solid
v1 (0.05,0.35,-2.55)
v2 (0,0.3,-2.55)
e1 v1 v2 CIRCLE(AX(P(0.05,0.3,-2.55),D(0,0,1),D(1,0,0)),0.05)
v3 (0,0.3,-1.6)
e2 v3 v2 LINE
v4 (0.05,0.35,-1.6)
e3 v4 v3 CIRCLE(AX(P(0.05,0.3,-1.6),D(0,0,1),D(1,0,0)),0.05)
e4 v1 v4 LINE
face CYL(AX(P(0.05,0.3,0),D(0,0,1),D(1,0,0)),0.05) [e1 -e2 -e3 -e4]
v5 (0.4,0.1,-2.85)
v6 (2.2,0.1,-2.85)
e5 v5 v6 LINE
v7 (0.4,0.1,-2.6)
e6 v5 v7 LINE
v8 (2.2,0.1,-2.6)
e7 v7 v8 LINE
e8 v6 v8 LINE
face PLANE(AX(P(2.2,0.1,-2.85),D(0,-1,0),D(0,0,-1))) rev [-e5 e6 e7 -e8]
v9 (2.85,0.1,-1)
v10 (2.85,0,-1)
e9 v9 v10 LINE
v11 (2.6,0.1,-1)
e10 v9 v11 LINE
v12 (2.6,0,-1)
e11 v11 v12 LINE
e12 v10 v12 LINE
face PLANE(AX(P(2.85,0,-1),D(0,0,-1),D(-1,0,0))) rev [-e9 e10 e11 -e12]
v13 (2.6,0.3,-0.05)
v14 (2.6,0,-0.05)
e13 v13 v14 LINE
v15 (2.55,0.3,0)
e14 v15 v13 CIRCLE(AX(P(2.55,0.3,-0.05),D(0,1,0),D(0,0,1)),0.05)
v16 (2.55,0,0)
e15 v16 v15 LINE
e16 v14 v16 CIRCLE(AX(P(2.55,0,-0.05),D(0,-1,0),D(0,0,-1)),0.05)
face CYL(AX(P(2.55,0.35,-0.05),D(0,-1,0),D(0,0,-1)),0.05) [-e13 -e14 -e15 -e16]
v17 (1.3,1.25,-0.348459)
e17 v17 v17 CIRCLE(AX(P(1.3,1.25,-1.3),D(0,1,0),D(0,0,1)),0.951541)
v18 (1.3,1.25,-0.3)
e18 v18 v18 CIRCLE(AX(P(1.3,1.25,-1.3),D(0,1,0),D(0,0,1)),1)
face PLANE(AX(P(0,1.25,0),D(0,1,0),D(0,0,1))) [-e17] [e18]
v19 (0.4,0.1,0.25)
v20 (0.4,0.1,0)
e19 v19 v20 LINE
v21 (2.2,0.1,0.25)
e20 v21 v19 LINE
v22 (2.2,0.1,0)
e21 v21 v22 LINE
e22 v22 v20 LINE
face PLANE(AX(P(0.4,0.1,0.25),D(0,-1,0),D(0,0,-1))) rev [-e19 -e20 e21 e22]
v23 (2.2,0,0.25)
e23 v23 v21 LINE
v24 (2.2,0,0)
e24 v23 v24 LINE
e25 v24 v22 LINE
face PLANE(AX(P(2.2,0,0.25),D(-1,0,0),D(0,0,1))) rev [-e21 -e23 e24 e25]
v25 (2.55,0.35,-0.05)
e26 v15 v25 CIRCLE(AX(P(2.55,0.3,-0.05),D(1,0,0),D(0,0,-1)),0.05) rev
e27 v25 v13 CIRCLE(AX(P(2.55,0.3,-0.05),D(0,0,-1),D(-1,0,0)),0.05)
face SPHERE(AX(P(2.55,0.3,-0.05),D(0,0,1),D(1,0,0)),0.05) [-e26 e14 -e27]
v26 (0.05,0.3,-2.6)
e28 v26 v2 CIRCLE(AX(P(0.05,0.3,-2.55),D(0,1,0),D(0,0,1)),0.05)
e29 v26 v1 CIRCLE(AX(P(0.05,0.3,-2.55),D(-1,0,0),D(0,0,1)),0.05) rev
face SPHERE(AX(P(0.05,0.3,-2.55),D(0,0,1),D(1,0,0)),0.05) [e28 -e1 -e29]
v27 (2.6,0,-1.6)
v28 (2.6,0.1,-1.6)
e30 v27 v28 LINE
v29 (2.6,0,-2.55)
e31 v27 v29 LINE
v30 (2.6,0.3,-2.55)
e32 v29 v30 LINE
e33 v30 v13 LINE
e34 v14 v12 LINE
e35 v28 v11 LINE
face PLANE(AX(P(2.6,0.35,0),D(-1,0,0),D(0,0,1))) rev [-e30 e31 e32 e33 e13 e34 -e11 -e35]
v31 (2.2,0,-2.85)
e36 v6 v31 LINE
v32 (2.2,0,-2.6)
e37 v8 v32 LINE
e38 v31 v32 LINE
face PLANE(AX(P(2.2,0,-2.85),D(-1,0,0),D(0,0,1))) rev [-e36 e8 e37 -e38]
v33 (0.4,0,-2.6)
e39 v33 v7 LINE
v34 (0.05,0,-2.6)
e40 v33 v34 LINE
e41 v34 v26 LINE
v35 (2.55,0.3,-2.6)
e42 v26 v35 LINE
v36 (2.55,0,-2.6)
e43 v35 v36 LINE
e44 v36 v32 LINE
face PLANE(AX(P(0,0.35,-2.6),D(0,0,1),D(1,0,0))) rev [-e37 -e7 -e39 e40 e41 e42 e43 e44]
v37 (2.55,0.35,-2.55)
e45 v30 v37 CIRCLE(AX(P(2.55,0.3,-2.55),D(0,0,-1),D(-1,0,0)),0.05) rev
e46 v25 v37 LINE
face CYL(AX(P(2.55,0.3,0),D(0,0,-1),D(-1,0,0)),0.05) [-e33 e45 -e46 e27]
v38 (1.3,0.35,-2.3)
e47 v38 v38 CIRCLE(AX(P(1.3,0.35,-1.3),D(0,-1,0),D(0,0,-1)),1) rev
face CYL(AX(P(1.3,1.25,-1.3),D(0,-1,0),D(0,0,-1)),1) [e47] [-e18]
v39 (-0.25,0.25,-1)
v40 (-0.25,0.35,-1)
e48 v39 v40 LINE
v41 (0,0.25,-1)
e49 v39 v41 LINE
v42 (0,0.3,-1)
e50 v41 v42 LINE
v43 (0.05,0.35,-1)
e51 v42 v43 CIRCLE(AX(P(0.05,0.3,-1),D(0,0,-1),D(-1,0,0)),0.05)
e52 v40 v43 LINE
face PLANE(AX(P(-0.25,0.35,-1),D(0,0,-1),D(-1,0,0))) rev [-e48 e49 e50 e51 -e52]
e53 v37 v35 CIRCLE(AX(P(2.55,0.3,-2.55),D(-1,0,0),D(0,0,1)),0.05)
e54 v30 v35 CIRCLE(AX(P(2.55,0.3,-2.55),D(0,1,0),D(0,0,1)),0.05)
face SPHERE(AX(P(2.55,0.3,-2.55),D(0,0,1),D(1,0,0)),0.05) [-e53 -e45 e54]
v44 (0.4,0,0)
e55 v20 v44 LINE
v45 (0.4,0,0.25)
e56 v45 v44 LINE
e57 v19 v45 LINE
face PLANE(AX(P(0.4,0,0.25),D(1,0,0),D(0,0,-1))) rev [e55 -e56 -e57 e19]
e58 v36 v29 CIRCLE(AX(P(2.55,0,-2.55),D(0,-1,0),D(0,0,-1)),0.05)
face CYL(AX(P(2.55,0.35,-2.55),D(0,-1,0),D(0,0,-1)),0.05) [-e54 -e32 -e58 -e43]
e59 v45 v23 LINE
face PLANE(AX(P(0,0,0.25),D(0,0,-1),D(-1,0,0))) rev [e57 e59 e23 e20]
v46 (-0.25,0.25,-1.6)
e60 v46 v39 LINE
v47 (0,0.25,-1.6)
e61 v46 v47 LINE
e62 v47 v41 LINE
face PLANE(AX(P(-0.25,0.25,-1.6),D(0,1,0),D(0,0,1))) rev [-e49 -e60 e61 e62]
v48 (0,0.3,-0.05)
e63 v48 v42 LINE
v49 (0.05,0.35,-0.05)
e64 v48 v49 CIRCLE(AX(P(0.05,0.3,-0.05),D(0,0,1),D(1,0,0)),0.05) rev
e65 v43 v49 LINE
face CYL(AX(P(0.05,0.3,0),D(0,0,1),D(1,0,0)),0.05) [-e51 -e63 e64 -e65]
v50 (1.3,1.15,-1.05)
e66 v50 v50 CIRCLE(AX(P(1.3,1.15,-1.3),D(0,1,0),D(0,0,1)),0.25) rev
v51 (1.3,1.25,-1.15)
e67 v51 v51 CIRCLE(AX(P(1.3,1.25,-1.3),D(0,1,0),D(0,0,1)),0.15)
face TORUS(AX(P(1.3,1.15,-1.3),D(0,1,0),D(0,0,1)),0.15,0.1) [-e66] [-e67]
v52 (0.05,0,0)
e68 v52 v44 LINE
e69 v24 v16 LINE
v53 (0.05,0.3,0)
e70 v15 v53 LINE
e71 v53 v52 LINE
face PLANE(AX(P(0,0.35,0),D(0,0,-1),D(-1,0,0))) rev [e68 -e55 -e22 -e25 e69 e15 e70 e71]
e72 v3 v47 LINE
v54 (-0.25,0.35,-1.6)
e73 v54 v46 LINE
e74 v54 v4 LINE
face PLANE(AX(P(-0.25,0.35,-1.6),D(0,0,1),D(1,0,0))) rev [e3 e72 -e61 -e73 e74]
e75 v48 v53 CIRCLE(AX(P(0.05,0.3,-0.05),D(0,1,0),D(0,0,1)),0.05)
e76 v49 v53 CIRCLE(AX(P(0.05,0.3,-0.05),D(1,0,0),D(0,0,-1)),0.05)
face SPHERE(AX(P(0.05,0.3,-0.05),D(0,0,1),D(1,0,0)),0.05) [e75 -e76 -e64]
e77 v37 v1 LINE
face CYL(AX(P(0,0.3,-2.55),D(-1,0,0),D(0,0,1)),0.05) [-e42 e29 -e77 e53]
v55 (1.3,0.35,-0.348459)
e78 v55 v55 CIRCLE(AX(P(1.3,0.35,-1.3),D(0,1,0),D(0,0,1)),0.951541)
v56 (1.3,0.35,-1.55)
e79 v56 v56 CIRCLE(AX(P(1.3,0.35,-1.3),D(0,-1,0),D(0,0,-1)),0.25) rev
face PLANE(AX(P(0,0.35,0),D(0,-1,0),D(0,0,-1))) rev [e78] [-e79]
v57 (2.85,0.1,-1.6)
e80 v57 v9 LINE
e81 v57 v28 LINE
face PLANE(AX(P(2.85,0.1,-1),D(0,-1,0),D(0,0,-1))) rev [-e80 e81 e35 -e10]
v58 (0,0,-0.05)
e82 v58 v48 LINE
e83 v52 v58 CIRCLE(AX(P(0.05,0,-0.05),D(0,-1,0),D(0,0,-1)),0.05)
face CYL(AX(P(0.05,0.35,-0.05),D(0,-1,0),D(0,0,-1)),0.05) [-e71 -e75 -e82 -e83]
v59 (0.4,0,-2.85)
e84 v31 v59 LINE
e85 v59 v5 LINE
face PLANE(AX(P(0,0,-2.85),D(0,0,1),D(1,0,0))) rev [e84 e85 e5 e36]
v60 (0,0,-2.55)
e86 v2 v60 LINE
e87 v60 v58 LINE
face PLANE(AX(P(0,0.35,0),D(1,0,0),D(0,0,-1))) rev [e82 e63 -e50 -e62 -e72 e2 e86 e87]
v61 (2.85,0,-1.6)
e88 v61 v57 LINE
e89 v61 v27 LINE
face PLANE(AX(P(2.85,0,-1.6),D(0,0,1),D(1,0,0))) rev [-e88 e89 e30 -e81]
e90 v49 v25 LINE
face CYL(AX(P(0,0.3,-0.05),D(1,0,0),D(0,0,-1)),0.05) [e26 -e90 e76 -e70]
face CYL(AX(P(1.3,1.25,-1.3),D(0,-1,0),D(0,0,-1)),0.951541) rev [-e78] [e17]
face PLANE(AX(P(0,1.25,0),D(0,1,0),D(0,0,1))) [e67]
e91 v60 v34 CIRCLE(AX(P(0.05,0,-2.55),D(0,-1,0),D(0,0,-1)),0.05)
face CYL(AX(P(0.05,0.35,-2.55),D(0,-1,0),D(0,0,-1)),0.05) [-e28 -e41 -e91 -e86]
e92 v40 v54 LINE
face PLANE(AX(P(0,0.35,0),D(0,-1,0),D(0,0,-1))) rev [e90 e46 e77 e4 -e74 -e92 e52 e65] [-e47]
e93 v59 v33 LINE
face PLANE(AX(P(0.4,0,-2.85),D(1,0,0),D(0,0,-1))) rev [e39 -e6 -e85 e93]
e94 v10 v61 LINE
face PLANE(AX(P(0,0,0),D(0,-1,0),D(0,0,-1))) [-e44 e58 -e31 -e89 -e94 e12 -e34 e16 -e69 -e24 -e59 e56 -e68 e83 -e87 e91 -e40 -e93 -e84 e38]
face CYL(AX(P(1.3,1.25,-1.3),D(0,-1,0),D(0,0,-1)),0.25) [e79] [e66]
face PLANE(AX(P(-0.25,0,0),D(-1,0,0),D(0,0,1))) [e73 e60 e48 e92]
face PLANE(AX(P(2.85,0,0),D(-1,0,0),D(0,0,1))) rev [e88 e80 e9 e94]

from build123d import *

# Parameters (mm, degrees)
SKETCH_1_W      = 2.6
SKETCH_1_H      = 2.6
EXTRUDE_1_DEPTH = 0.35
SKETCH_2_R      = 1
SKETCH_2_R_2    = 0.951541019
SKETCH_2_R_3    = 0.25
EXTRUDE_2_DEPTH = 0.9
SKETCH_3_W      = 0.6
SKETCH_3_H      = 0.1
EXTRUDE_3_DEPTH = 0.25
SKETCH_4_W      = 1.8
SKETCH_4_H      = 0.1
EXTRUDE_4_DEPTH = 0.25
SKETCH_5_W      = 1.8
SKETCH_5_H      = 0.1
EXTRUDE_5_DEPTH = 0.25
SKETCH_6_W      = 0.6
SKETCH_6_H      = 0.1
EXTRUDE_6_DEPTH = 0.25
FILLET_1_R      = 0.1
FILLET_2_R      = 0.05
FILLET_3_R      = 0.05


with BuildPart() as part:
    # 草图1 → 凸台-拉伸1 (new body)
    with BuildSketch(Plane(origin=(0, 0, 0), x_dir=(1, 0, 0), z_dir=(0, 1, 0))):
        with Locations((1.3, 1.3)):
            Rectangle(SKETCH_1_W, SKETCH_1_H)
    extrude(amount=EXTRUDE_1_DEPTH)

    # 草图2 → 凸台-拉伸2 (add)
    # profile 1 of 2: a face of its own
    with BuildSketch(Plane(origin=(0, 0.35, 0), x_dir=(1, 0, 0), z_dir=(0, 1, 0))):
        with Locations(Location((1.3, 1.3, 0), (0, 0, 90))):
            Circle(SKETCH_2_R)
        with Locations(Location((1.3, 1.3, 0), (0, 0, 270))):
            Circle(SKETCH_2_R_2, mode=Mode.SUBTRACT)
    # profile 2 of 2: a face of its own
    with BuildSketch(Plane(origin=(0, 0.35, 0), x_dir=(1, 0, 0), z_dir=(0, 1, 0))):
        with Locations(Location((1.3, 1.3, 0), (0, 0, 90))):
            Circle(SKETCH_2_R_3)
    extrude(amount=EXTRUDE_2_DEPTH)

    # 草图3 → 凸台-拉伸3 (add)
    with BuildSketch(Plane(origin=(2.6, 0, 0), x_dir=(0, 0, -1), z_dir=(1, 0, 0))):
        with Locations((1.3, 0.05)):
            Rectangle(SKETCH_3_W, SKETCH_3_H)
    extrude(amount=EXTRUDE_3_DEPTH)

    # 草图4 → 凸台-拉伸4 (add)
    with BuildSketch(Plane.XY):
        with Locations((1.3, 0.05)):
            Rectangle(SKETCH_4_W, SKETCH_4_H)
    extrude(amount=EXTRUDE_4_DEPTH)

    # 草图5 → 凸台-拉伸5 (add)
    with BuildSketch(Plane(origin=(0, 0, -2.6), x_dir=(-1, 0, 0), z_dir=(0, 0, -1))):
        with Locations((-1.3, 0.05)):
            Rectangle(SKETCH_5_W, SKETCH_5_H)
    extrude(amount=EXTRUDE_5_DEPTH)

    # 草图6 → 凸台-拉伸6 (add)
    with BuildSketch(Plane.ZY):
        with Locations((-1.3, 0.3)):
            Rectangle(SKETCH_6_W, SKETCH_6_H)
    extrude(amount=EXTRUDE_6_DEPTH)

    # 圆角1
    fillet_1_edges = [part.edges().sort_by_distance(p)[0] for p in [
        (1.3, 1.25, -1.05),
    ]]
    fillet(fillet_1_edges, radius=FILLET_1_R)

    # 圆角2
    fillet_2_edges = [part.edges().sort_by_distance(p)[0] for p in [
        (2.6, 0.35, -1.3),
        (1.3, 0.35, -2.6),
        (0, 0.35, -2.1),
        (0, 0.35, -0.5),
        (1.3, 0.35, 0),
    ]]
    fillet(fillet_2_edges, radius=FILLET_2_R)

    # 圆角3
    # the kernel refuses this fillet: 0.05 mm, written as the material it takes off along each edge
    with BuildSketch(Plane(origin=(0.05, 0.3, -2.55), x_dir=(0, 0, -1), z_dir=(-1, 0, 0))) as fillet_3_piece_1_section:
        Polygon((0, 0), (FILLET_3_R, 0), (FILLET_3_R, -FILLET_3_R), (0, -FILLET_3_R), align=None)
    fillet_3_piece_1 = extrude(amount=FILLET_3_R, mode=Mode.PRIVATE)
    fillet_3_piece_1 = fillet_3_piece_1 - Plane(origin=(0.05, 0.3, -2.55), x_dir=(0, -0.7071067811865475, 0.7071067811865475), z_dir=(-1, 0, 0)) * Sphere(FILLET_3_R, mode=Mode.PRIVATE)
    add(fillet_3_piece_1, mode=Mode.SUBTRACT)
    with BuildSketch(Plane(origin=(0.05, 0.3, -0.05), x_dir=(0, 0, 1), z_dir=(-1, 0, 0))) as fillet_3_piece_2_section:
        Polygon((0, 0), (FILLET_3_R, 0), (FILLET_3_R, FILLET_3_R), (0, FILLET_3_R), align=None)
    fillet_3_piece_2 = extrude(amount=FILLET_3_R, mode=Mode.PRIVATE)
    fillet_3_piece_2 = fillet_3_piece_2 - Plane(origin=(0.05, 0.3, -0.05), x_dir=(0, -0.7071067811865475, -0.7071067811865475), z_dir=(-1, 0, 0)) * Sphere(FILLET_3_R, mode=Mode.PRIVATE)
    add(fillet_3_piece_2, mode=Mode.SUBTRACT)
    with BuildSketch(Plane(origin=(2.55, 0.3, -0.05), x_dir=(0, 0, 1), z_dir=(1, 0, 0))) as fillet_3_piece_3_section:
        Polygon((0, 0), (FILLET_3_R, 0), (FILLET_3_R, -FILLET_3_R), (0, -FILLET_3_R), align=None)
    fillet_3_piece_3 = extrude(amount=FILLET_3_R, mode=Mode.PRIVATE)
    fillet_3_piece_3 = fillet_3_piece_3 - Plane(origin=(2.55, 0.3, -0.05), x_dir=(0, -0.7071067811865475, -0.7071067811865475), z_dir=(1, 0, 0)) * Sphere(FILLET_3_R, mode=Mode.PRIVATE)
    add(fillet_3_piece_3, mode=Mode.SUBTRACT)
    with BuildSketch(Plane(origin=(2.55, 0.3, -2.55), x_dir=(1, 0, 0), z_dir=(0, 0, -1))) as fillet_3_piece_4_section:
        Polygon((0, 0), (FILLET_3_R, 0), (FILLET_3_R, -FILLET_3_R), (0, -FILLET_3_R), align=None)
    fillet_3_piece_4 = extrude(amount=FILLET_3_R, mode=Mode.PRIVATE)
    fillet_3_piece_4 = fillet_3_piece_4 - Plane(origin=(2.55, 0.3, -2.55), x_dir=(-0.7071067811865475, -0.7071067811865475, 0), z_dir=(0, 0, -1)) * Sphere(FILLET_3_R, mode=Mode.PRIVATE)
    add(fillet_3_piece_4, mode=Mode.SUBTRACT)
    with BuildSketch(Plane(origin=(0, -0.125, -2.6), x_dir=(0, 0, 1), z_dir=(0, 1, 0)), Plane(origin=(2.6, -0.125, 0), x_dir=(0, 0, -1), z_dir=(0, 1, 0)), Plane(origin=(2.6, -0.125, -2.6), x_dir=(-1, 0, 0), z_dir=(0, 1, 0))) as fillet_3_piece_5:
        with BuildLine():
            CenterArc((FILLET_3_R, FILLET_3_R), FILLET_3_R, 180, 90)
            Line((0, FILLET_3_R), (0, 0))
            Line((0, 0), (FILLET_3_R, 0))
        make_face()
    extrude(amount=0.425, mode=Mode.SUBTRACT)
    with BuildSketch(Plane(origin=(0, -0.125, 0), x_dir=(0, 0, -1), z_dir=(0, 1, 0))) as fillet_3_piece_6:
        with BuildLine():
            CenterArc((FILLET_3_R, -FILLET_3_R), FILLET_3_R, 90, 90)
            Line((0, -FILLET_3_R), (0, 0))
            Line((0, 0), (FILLET_3_R, 0))
        make_face()
    extrude(amount=0.425, mode=Mode.SUBTRACT)


solid = part.part
